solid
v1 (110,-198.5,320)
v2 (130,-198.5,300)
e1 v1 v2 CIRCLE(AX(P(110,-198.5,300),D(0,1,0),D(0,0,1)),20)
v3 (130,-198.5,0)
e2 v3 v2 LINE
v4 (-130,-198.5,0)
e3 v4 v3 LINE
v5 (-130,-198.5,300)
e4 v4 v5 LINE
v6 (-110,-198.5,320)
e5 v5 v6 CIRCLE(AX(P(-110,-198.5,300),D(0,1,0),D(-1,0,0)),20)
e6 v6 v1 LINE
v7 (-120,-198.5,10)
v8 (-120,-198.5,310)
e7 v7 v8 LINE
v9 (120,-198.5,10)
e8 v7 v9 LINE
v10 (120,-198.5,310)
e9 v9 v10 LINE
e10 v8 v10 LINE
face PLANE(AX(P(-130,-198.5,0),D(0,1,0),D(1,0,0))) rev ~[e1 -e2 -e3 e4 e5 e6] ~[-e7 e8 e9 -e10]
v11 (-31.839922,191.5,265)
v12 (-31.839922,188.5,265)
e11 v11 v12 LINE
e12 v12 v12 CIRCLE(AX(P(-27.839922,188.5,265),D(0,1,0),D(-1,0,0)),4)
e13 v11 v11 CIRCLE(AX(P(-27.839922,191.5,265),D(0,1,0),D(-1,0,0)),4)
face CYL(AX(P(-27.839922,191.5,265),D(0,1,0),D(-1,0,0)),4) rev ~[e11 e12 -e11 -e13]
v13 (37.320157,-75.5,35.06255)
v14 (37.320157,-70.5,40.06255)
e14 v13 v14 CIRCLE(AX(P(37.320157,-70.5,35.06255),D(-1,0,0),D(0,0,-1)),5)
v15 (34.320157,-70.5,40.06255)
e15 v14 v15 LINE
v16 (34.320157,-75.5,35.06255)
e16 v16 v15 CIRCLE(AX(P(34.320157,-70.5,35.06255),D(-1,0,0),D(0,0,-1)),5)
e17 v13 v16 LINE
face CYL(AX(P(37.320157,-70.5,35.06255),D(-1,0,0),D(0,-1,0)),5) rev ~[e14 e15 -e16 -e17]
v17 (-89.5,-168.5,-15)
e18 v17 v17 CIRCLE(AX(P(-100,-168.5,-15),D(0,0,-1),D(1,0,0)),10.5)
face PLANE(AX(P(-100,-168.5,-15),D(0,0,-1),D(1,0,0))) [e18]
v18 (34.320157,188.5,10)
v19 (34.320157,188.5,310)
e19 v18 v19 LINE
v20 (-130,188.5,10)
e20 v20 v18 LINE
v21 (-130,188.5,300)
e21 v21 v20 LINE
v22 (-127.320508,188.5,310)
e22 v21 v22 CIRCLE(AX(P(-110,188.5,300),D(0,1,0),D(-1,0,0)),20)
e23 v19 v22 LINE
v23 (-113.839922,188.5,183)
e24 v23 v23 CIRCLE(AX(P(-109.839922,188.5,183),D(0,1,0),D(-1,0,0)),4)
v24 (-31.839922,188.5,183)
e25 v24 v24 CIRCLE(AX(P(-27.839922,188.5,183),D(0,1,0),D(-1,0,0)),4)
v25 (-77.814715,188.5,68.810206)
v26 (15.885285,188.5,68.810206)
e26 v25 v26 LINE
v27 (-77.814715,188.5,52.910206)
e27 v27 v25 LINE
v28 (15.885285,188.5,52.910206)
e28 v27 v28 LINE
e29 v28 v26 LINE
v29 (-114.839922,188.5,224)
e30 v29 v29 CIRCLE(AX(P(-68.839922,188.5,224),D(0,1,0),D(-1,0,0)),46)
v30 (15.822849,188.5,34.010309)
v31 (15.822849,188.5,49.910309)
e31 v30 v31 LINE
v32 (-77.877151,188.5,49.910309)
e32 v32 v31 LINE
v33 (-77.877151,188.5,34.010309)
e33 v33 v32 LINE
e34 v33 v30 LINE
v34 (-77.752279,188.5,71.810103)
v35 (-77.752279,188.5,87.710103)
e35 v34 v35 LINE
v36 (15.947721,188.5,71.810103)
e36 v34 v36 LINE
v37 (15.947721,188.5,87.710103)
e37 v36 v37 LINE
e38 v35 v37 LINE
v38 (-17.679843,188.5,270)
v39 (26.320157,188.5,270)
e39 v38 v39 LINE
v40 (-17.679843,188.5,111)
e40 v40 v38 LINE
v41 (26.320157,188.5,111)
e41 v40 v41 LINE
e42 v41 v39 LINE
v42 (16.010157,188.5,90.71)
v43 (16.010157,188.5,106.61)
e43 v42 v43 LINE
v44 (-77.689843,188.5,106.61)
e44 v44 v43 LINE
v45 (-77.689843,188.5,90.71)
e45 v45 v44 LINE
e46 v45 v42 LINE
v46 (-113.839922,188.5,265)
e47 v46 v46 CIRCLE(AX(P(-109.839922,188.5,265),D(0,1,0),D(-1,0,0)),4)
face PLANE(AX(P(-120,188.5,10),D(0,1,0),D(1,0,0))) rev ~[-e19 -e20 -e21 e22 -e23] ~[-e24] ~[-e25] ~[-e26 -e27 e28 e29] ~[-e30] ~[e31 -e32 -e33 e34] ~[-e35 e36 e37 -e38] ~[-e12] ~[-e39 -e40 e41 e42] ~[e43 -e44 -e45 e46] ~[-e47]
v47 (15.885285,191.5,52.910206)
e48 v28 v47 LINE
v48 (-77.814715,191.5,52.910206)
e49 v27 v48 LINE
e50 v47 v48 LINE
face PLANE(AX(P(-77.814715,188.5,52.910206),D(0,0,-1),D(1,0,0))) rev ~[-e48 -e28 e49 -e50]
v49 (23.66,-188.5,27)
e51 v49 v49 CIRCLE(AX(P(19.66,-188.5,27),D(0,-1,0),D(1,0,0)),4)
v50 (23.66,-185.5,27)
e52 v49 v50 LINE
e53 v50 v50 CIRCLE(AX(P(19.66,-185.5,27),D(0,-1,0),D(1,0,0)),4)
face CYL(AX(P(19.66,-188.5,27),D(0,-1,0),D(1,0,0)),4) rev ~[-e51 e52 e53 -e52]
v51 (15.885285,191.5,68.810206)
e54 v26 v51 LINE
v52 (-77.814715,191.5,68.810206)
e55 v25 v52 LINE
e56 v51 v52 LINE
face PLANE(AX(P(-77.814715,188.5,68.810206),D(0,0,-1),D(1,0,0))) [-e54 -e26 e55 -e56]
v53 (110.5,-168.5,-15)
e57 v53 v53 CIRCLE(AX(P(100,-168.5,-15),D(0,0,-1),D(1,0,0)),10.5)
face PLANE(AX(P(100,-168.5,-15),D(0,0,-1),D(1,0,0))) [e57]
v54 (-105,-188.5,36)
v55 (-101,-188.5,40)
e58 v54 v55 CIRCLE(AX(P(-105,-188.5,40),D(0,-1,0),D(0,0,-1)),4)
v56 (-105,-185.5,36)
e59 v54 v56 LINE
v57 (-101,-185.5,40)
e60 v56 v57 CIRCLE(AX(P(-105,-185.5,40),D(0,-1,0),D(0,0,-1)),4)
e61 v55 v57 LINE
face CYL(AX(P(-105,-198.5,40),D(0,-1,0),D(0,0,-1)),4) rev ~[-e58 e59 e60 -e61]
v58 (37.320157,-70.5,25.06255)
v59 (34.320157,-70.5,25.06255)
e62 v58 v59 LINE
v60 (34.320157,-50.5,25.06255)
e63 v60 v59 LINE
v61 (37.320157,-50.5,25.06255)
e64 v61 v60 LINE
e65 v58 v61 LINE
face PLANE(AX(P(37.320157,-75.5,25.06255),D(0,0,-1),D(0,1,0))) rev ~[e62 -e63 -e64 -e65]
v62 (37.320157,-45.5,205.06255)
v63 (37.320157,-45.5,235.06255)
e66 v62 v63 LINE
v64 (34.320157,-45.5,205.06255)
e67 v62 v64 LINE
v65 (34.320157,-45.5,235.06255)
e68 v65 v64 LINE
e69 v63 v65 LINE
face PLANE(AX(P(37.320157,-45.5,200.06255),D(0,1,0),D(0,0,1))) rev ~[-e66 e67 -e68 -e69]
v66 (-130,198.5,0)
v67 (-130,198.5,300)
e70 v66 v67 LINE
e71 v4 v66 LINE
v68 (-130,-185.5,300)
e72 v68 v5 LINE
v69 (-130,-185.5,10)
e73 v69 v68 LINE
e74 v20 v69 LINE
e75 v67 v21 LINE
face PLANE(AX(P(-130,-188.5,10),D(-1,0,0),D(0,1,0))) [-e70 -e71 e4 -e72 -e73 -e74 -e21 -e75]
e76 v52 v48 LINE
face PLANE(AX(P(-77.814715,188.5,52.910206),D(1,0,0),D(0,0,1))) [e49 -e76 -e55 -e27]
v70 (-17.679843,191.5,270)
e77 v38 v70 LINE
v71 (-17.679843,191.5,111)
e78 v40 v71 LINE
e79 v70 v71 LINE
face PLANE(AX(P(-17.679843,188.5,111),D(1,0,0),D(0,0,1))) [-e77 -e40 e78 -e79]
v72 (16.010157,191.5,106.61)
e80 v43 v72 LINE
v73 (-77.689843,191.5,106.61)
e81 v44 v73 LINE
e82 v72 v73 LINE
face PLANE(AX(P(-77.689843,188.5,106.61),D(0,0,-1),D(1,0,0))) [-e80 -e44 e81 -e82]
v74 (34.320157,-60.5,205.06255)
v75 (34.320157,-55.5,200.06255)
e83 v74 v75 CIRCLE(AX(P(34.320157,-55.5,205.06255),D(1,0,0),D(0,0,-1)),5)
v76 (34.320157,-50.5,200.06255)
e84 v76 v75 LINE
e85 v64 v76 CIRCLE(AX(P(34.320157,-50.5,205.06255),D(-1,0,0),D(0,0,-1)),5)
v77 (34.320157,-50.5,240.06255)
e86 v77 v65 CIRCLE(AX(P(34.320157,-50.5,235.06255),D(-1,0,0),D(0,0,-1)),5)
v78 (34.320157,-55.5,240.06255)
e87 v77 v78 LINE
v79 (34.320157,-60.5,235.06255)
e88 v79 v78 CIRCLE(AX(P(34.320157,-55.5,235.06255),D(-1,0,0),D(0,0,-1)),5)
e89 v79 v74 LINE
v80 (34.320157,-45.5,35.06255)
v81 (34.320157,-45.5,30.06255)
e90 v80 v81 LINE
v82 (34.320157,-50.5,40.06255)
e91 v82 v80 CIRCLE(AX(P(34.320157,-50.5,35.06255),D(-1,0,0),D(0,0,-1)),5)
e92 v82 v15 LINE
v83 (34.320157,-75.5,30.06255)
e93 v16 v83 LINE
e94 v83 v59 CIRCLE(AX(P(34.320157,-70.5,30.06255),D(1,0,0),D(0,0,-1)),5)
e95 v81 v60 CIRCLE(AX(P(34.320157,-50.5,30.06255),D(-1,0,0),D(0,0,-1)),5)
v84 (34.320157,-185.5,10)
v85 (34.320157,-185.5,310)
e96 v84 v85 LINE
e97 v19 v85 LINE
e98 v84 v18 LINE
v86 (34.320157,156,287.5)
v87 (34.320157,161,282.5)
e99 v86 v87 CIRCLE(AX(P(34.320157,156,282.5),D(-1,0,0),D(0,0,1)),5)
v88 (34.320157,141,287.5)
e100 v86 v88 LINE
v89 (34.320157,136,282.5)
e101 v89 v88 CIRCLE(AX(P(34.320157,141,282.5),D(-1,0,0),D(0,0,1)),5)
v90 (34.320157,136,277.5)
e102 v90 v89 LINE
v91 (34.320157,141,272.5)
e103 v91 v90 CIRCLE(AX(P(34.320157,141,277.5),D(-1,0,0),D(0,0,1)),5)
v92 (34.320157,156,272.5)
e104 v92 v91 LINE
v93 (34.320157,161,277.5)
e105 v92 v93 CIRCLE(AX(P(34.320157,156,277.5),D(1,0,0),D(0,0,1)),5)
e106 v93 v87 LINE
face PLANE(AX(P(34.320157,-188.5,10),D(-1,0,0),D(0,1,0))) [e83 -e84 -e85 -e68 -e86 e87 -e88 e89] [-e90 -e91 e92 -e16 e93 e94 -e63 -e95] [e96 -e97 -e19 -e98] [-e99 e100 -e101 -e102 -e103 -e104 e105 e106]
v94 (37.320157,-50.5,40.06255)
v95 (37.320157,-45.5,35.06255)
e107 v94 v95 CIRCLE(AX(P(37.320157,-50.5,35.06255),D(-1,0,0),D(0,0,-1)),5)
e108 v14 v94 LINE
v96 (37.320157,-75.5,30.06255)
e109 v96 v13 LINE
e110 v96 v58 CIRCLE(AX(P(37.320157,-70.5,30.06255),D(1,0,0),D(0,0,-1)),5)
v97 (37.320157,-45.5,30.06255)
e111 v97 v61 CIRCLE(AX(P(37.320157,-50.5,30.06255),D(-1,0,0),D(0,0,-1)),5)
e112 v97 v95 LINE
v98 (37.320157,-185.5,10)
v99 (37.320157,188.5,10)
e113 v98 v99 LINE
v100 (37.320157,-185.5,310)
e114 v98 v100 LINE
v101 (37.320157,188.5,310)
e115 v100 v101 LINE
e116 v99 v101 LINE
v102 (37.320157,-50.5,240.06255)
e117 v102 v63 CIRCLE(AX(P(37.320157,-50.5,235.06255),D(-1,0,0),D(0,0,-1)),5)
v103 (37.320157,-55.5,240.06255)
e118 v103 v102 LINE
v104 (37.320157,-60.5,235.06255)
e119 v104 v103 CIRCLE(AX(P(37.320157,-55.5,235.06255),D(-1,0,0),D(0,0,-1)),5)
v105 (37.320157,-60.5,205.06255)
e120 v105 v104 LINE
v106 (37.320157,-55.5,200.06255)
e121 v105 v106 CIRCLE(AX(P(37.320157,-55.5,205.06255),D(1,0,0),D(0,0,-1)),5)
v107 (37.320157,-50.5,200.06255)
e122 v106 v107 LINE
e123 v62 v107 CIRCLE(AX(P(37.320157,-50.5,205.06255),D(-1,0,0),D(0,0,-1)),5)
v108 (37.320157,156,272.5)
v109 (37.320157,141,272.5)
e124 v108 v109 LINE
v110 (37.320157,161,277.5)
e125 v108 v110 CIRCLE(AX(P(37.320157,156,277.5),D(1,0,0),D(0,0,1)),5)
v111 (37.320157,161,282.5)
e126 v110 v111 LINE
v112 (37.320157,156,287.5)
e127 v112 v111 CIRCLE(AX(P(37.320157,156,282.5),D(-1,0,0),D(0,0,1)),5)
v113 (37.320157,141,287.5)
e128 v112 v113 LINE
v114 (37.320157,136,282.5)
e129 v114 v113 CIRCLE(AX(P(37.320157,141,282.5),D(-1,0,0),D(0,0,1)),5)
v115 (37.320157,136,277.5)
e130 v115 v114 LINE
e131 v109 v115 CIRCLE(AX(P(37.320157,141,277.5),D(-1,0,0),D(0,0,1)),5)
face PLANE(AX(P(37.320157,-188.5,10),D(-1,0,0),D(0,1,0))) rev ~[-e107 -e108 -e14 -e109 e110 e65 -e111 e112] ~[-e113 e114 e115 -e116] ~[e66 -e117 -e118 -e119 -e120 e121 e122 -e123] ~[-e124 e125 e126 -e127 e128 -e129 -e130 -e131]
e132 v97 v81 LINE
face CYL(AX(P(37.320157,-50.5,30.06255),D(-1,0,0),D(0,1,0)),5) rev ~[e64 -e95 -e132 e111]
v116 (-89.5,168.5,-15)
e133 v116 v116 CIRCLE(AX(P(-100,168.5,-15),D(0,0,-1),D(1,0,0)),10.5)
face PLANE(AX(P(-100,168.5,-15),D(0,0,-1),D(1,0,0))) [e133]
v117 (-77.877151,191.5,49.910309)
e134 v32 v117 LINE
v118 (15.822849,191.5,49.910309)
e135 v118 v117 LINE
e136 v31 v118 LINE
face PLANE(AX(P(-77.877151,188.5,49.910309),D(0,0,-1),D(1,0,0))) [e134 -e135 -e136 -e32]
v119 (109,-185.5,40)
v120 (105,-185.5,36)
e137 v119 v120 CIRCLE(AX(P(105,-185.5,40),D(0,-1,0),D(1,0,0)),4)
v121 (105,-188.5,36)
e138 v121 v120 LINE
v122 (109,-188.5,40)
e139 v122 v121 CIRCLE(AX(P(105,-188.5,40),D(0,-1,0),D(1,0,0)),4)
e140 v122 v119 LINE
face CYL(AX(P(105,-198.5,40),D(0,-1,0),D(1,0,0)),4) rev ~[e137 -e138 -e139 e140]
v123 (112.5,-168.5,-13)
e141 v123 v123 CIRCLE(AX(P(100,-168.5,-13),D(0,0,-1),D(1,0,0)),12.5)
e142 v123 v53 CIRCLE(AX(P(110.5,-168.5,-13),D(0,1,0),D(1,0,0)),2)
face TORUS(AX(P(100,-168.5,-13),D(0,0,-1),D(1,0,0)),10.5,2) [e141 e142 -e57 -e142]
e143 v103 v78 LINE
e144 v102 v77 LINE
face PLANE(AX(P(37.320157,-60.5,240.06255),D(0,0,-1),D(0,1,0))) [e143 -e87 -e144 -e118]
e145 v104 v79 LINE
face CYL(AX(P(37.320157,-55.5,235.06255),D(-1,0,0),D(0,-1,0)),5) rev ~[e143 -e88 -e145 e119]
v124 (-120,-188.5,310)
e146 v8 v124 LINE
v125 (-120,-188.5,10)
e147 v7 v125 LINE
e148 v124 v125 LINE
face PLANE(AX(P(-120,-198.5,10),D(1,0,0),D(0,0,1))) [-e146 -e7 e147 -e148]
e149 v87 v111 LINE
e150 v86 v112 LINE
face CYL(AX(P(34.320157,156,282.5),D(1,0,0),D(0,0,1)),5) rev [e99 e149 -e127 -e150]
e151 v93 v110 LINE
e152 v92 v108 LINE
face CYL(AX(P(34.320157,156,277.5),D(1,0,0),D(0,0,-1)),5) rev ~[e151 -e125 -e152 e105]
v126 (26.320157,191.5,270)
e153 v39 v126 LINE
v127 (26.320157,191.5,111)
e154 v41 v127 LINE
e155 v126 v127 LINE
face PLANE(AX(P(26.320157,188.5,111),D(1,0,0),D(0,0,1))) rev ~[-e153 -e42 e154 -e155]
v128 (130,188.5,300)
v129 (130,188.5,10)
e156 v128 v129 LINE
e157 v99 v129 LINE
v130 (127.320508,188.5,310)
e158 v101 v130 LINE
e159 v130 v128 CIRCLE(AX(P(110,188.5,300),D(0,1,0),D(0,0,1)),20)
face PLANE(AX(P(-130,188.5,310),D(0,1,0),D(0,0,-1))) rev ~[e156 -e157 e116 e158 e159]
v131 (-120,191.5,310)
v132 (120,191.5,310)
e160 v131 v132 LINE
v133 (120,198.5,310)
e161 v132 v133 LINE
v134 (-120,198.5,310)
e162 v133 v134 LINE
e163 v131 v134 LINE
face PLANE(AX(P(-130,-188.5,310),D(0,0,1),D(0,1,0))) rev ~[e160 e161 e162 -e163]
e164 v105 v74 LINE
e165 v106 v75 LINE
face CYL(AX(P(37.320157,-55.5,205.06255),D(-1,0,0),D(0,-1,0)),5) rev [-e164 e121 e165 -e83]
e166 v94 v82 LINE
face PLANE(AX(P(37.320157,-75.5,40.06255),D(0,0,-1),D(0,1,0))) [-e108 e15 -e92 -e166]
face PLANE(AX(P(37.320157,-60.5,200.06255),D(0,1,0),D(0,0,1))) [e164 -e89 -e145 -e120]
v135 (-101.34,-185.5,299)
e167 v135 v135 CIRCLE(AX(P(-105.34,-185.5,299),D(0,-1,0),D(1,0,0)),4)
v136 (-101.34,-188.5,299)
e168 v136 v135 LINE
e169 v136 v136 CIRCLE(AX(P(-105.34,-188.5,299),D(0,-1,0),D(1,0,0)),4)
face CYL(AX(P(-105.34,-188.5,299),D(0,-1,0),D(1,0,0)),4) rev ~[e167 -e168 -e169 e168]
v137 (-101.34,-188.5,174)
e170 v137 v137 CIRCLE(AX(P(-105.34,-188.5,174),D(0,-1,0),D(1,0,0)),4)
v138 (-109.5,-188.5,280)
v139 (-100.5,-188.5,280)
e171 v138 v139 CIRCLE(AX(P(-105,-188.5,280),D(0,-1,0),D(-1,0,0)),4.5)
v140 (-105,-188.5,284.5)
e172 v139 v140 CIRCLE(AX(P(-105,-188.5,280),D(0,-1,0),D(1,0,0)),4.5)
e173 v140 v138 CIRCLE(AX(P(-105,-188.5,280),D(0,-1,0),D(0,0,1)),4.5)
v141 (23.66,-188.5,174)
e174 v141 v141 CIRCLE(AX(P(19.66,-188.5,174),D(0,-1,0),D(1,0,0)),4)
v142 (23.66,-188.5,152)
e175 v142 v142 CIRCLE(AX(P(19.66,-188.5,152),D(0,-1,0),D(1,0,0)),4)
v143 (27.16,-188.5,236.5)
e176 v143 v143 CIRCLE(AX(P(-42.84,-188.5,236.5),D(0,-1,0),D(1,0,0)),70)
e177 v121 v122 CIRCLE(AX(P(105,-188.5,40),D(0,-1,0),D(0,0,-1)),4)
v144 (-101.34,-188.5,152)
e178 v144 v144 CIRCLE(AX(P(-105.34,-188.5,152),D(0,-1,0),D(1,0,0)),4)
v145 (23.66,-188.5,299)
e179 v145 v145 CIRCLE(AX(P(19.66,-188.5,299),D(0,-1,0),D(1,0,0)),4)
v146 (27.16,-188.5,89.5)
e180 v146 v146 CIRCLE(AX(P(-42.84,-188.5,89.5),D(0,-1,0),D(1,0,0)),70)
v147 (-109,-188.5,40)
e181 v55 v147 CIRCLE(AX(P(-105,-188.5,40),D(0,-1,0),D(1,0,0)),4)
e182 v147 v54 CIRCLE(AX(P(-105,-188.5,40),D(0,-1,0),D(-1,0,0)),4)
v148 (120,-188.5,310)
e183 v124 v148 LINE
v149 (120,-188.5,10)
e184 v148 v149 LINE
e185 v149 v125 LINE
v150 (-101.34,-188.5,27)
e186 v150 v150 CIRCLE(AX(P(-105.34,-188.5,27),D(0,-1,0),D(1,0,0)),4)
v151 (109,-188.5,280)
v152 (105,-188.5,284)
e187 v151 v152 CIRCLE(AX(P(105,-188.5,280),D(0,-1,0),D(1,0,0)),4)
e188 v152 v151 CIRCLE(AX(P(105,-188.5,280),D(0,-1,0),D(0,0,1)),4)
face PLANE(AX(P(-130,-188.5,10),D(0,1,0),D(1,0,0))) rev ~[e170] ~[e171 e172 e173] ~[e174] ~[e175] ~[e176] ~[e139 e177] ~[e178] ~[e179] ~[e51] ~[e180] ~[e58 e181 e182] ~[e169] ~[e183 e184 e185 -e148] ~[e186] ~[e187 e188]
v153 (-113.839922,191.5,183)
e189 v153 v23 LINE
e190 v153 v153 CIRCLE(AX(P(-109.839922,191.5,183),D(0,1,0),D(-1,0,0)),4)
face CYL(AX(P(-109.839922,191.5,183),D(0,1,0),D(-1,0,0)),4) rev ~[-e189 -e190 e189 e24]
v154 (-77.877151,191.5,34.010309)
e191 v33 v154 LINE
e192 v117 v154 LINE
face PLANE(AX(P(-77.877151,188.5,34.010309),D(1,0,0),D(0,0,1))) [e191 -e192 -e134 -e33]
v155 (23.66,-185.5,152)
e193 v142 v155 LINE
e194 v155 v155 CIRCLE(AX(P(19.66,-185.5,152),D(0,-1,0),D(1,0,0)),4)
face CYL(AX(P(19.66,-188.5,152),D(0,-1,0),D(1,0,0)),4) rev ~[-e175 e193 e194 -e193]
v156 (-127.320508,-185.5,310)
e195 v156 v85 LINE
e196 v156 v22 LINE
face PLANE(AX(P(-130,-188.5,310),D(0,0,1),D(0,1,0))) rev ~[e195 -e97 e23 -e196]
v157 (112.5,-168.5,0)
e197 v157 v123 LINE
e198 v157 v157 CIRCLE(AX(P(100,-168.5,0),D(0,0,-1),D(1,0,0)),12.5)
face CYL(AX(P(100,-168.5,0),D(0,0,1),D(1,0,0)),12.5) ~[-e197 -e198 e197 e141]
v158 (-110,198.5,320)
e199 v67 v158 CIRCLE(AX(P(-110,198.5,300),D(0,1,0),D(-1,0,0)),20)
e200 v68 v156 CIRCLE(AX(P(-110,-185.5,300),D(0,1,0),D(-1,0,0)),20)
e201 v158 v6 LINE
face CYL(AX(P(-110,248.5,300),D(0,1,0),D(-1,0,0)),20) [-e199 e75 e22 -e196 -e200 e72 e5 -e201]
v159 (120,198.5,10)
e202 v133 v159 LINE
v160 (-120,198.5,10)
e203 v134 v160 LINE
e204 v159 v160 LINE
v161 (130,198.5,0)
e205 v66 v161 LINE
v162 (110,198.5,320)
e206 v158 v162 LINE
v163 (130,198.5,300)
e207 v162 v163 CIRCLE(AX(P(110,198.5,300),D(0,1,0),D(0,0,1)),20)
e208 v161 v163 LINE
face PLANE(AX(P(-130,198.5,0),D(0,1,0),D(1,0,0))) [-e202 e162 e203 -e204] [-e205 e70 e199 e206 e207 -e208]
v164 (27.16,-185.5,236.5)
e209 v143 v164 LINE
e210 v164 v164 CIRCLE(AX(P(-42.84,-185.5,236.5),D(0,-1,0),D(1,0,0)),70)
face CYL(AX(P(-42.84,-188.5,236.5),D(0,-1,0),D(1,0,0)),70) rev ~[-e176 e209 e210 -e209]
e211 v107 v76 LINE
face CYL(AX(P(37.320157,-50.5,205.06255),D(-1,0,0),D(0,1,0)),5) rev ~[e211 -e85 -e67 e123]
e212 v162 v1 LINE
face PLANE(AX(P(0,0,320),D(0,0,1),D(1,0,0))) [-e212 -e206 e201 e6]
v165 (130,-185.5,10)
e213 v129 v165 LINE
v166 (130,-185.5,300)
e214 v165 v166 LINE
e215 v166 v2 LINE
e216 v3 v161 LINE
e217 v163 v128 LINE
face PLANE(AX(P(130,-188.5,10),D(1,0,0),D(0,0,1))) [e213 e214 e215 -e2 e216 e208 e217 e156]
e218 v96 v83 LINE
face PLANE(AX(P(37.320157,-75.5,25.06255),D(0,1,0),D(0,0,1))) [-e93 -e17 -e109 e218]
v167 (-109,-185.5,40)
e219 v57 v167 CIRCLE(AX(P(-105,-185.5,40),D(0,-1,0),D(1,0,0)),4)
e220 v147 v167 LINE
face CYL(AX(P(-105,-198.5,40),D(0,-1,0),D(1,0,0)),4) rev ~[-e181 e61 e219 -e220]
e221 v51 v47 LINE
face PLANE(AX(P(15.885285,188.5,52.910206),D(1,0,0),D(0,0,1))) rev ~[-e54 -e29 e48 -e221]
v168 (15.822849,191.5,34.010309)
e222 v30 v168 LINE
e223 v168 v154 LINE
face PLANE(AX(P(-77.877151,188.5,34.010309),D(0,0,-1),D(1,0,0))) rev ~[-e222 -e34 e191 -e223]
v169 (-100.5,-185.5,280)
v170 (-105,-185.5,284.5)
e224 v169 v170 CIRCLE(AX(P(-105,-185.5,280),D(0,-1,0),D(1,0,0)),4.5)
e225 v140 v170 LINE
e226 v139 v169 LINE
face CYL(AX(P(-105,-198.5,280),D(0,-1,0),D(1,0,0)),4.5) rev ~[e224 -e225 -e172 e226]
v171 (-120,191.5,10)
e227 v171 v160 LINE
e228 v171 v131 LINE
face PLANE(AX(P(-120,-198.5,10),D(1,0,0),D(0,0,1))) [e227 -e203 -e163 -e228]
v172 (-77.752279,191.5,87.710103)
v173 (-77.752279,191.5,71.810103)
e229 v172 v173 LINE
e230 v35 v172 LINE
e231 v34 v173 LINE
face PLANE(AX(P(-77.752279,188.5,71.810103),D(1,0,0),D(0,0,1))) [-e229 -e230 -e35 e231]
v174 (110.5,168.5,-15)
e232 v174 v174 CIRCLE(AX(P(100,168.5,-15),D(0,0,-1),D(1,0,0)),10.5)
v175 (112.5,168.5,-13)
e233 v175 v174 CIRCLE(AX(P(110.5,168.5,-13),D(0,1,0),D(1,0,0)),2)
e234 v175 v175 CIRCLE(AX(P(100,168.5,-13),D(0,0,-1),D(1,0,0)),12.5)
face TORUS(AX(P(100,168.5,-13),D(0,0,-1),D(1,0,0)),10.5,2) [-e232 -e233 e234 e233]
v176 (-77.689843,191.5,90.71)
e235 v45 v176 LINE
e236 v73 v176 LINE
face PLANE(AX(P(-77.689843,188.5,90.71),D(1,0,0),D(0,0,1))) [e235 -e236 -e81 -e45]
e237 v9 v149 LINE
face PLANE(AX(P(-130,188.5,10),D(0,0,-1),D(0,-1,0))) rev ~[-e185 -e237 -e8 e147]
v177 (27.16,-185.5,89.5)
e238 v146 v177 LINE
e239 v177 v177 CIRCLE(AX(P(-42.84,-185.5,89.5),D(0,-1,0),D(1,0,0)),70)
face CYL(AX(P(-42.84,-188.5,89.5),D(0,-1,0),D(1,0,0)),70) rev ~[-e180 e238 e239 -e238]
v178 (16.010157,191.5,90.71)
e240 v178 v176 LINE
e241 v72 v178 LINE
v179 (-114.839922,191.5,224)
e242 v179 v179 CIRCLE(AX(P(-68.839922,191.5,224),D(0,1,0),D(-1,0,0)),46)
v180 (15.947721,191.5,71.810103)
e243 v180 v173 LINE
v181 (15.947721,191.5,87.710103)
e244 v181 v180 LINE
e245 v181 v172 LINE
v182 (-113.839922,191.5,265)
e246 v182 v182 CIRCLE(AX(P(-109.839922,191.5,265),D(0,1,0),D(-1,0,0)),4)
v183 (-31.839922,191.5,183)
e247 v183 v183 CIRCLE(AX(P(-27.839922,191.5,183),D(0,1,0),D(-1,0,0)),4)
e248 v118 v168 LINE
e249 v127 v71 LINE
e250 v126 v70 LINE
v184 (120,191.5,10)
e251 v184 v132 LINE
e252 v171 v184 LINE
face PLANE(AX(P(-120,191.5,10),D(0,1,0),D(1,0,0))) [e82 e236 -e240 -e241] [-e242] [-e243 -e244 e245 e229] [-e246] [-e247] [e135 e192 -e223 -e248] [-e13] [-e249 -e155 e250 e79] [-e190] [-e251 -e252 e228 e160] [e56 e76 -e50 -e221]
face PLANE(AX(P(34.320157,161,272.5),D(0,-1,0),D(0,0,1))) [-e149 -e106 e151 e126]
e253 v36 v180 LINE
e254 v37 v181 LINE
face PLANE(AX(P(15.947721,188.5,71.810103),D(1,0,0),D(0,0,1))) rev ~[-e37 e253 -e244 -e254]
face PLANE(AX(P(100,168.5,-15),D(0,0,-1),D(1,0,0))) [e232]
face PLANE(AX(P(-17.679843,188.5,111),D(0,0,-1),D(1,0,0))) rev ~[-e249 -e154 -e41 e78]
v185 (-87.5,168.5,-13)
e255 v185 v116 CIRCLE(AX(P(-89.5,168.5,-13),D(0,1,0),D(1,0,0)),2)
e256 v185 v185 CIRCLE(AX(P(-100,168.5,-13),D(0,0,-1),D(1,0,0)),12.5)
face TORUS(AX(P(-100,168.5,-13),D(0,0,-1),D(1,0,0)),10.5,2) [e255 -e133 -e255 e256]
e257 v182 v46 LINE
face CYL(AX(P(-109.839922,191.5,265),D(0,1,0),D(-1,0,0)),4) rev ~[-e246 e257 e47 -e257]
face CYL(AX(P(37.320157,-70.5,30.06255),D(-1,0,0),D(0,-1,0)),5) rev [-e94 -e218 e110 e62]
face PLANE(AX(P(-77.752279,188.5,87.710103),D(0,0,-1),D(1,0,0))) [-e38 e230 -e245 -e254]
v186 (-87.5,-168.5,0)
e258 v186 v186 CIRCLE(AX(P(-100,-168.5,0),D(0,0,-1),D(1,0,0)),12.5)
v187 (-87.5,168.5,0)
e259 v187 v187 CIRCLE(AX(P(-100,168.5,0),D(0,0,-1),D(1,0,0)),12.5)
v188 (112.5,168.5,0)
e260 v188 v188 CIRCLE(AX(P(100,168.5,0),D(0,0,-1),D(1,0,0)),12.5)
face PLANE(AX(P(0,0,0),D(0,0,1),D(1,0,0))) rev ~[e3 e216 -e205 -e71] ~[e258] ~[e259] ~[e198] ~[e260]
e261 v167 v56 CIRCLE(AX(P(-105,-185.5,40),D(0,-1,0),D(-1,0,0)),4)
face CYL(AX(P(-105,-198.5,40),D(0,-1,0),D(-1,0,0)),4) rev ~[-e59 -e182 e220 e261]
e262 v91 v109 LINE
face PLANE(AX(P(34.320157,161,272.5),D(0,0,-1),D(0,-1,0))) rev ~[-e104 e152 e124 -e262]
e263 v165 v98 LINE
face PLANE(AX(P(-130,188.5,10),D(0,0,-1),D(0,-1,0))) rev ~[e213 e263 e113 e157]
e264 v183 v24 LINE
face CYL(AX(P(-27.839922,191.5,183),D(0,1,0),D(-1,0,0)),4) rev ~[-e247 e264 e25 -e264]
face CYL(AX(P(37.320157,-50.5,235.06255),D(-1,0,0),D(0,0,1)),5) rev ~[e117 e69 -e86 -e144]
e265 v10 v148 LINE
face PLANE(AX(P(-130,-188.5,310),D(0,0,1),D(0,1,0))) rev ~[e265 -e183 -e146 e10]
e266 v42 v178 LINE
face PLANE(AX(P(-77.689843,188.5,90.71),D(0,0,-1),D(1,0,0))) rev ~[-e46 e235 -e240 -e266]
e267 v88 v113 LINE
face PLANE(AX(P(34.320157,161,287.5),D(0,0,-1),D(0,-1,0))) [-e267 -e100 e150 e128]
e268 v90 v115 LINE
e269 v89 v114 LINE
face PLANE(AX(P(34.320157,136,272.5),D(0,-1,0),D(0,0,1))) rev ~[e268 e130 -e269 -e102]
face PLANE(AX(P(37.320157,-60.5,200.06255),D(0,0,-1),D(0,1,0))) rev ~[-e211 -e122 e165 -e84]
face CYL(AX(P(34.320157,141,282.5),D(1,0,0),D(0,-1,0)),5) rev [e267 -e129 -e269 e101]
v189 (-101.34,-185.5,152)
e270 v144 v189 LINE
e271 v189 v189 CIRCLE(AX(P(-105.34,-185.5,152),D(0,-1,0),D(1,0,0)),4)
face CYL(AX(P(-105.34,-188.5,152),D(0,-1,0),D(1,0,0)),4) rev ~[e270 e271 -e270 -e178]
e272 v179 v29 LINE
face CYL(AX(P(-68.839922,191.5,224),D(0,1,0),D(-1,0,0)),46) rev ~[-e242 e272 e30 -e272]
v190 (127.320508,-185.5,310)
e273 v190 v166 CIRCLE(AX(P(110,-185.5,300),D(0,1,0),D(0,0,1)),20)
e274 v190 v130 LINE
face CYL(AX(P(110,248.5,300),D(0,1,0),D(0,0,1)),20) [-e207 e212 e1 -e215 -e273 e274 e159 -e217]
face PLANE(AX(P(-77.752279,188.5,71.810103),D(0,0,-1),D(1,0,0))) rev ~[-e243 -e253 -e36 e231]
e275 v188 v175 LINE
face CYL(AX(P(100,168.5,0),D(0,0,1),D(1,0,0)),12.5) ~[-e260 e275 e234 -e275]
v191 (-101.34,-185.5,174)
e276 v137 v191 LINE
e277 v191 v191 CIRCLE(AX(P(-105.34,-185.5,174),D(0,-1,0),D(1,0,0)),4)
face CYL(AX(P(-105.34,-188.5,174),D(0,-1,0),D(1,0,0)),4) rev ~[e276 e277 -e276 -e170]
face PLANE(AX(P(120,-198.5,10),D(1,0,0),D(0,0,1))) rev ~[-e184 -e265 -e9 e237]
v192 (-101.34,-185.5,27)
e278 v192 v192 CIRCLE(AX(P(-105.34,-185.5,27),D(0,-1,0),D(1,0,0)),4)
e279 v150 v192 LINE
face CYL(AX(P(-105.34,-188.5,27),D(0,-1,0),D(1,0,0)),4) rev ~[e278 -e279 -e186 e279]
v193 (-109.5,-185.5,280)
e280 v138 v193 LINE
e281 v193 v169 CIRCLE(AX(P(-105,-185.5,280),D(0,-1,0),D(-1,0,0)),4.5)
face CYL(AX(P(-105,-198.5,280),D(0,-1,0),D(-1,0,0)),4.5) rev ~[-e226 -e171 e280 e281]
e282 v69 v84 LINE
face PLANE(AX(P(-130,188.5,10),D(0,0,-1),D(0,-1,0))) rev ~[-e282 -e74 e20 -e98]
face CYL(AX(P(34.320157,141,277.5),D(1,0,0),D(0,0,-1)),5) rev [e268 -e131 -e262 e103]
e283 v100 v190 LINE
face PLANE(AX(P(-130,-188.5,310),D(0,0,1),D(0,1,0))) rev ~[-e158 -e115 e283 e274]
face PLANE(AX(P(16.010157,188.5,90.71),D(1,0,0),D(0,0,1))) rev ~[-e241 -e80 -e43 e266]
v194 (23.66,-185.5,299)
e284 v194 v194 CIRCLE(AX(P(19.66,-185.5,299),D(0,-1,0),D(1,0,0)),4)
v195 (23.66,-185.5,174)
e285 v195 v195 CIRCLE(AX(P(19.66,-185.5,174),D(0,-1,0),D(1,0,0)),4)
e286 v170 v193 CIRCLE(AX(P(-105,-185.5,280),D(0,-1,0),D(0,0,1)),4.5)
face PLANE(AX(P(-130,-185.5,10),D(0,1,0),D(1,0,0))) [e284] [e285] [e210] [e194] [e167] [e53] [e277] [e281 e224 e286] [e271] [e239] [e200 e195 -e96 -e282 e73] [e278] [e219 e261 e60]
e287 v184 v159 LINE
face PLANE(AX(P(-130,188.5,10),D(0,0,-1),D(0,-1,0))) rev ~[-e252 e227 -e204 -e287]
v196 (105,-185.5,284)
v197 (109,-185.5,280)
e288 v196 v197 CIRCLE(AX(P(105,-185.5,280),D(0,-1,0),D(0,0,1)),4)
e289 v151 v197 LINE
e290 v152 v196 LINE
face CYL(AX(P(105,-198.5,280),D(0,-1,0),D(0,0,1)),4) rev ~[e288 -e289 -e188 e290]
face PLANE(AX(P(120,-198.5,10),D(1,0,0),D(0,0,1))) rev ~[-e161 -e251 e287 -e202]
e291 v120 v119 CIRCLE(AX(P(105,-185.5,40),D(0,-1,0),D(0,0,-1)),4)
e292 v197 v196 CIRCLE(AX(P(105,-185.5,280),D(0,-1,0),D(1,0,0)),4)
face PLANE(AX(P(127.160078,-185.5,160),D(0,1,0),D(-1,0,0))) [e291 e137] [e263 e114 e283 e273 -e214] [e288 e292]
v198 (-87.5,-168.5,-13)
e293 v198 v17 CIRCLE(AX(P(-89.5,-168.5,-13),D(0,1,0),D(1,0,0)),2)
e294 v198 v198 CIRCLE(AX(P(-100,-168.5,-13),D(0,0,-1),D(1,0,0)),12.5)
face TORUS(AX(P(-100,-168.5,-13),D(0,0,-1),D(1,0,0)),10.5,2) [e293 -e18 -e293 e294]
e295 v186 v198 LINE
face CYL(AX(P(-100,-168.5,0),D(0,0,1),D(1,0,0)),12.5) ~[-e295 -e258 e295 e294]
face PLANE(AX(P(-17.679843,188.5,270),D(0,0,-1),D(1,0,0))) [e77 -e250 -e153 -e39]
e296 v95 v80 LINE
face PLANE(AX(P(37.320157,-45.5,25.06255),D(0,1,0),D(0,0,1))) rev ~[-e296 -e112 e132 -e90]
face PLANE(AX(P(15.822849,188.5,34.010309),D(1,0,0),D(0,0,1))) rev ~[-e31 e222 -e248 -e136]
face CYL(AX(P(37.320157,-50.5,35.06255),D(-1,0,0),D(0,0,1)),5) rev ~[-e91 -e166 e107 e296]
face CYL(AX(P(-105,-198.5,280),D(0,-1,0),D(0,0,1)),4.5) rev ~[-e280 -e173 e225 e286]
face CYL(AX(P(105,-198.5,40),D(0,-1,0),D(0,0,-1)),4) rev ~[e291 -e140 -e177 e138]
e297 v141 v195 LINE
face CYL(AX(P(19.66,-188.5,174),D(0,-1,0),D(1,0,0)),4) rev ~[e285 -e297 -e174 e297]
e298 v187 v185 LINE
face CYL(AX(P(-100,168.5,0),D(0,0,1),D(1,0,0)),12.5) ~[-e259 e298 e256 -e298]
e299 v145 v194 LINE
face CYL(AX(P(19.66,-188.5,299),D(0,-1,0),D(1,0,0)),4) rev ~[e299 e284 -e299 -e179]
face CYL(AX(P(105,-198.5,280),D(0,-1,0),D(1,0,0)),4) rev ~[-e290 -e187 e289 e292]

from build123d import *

# Parameters (mm, degrees)
F0_W         = 260
F0_H         = 397
F1_DEPTH     = 320
F2_W         = 240
F2_H         = 300
F3_DEPTH     = 506.73
F5_DEPTH     = 304.8
F6_W         = 3
F6_H         = 377
F7_DEPTH     = 300
F8_R         = 12.5
F9_DEPTH     = 15
F10_R        = 2
F11_W        = 3
F11_H        = 377
F12_DEPTH    = 300
F13_W        = 3
F13_H        = 300
F14_DEPTH    = 87
F15_W        = 3
F15_H        = 300
F16_DEPTH    = 160
F17_R        = 4
F17_R_2      = 70
F18_DEPTH    = 10
F19_W        = 344
F19_H        = 300
F20_DEPTH    = 206
F21_W        = 240
F21_H        = 3
F22_DEPTH    = 300
F23_W        = 44
F23_H        = 159
F23_W_2      = 93.7
F23_H_2      = 15.9
F24_DEPTH    = 25
F25_R        = 4
F25_R_2      = 46
F26_DEPTH    = 25
F27_W        = 3
F27_H        = 300
F28_DEPTH    = 377
F29_W        = 30
F29_H        = 300
F30_DEPTH    = 25
F31_W        = 161.3201568723
F31_H        = 300
F32_DEPTH    = 25
F33_W        = 164.3201568723
F33_H        = 3
F34_DEPTH    = 300
F35_T1_DEPTH = 497
F36_R        = 70
F36_R_2      = 4
F37_DEPTH    = 25
F38_W        = 377
F38_H        = 300
F39_DEPTH    = 3
F40_W        = 5.6798431277
F40_H        = 300
F41_DEPTH    = 3
F42_T1_DEPTH = 497
F43_W        = 3
F43_H        = 374
F44_DEPTH    = 300
F45_W        = 3
F45_H        = 374
F46_DEPTH    = 300
F47_W        = 25
F47_H        = 15
F48_DEPTH    = 25
F49_R        = 5
F51_W        = 15
F51_H        = 40
F51_W_2      = 30
F51_H_2      = 15
F52_DEPTH    = 25
F53_R        = 5
F54_R        = 5
F56_DEPTH    = 25


# Not quite as in the source:
# - a fillet or chamfer that OpenCascade refuses, or shapes differently, is made with other operations: its cross-section is extruded or revolved along the edge and cut away or added


with BuildPart() as f1:
    # F0 (on Top) → F1 (new body)
    with BuildSketch(Plane.XY):
        Rectangle(F0_W, F0_H)
    extrude(amount=F1_DEPTH)

    # F2 (on face) → F3 (cut)
    with BuildSketch(Plane.XZ.offset(198.5)):
        with Locations((0, 160)):
            Rectangle(F2_W, F2_H)
    extrude(amount=-F3_DEPTH, mode=Mode.SUBTRACT)

    # F4 (on face) → F5 (cut)
    with BuildSketch(Plane(origin=(-130, 0, 0), x_dir=(0, -1, 0), z_dir=(-1, 0, 0))):
        Polygon((188.5, 10), (188.5, 310), (-188.5, 310), (-188.5, 10), (0, 10), align=None)
    extrude(amount=-F5_DEPTH, mode=Mode.SUBTRACT)

    # F6 (on face) → F7 (join)
    with BuildSketch(Plane.XY.offset(10)):
        with Locations((-125.8077577353, 0)):
            Rectangle(F6_W, F6_H)
        with Locations((125.8201568723, 0)):
            Rectangle(F6_W, F6_H)
    extrude(amount=F7_DEPTH)

    # F8 (on face) → F9 (join)
    with BuildSketch(Plane(origin=(0, 0, 0), x_dir=(1, 0, 0), z_dir=(0, 0, -1))):
        with Locations((-100, 168.5)):
            Circle(F8_R)
        with Locations((100, 168.5)):
            Circle(F8_R)
        with Locations((100, -168.5)):
            Circle(F8_R)
        with Locations((-100, -168.5)):
            Circle(F8_R)
    extrude(amount=F9_DEPTH)

    # F10
    f10_edges = [f1.edges().sort_by_distance(p)[0] for p in [
        (-112.5, -168.5, -15),
        (87.5, -168.5, -15),
        (87.5, 168.5, -15),
        (-112.5, 168.5, -15),
    ]]
    fillet(f10_edges, radius=F10_R)

    # F11 (on face) → F12 (join)
    with BuildSketch(Plane.XY.offset(10)):
        with Locations((35.8201568723, 0)):
            Rectangle(F11_W, F11_H)
    extrude(amount=F12_DEPTH)

    # F13 (on face) → F14 (join)
    with BuildSketch(Plane.YZ.offset(37.3201568723)):
        with Locations((-187, 160)):
            Rectangle(F13_W, F13_H)
    extrude(amount=F14_DEPTH)

    # F15 (on face) → F16 (join)
    with BuildSketch(Plane(origin=(34.3201568723, 0, 0), x_dir=(0, -1, 0), z_dir=(-1, 0, 0))):
        with Locations((157, 160)):
            Rectangle(F15_W, F15_H)
    extrude(amount=F16_DEPTH)

    # F17 (on face) → F18 (cut)
    with BuildSketch(Plane.XZ.offset(158.5)):
        with Locations((-105.3498431277, 299)):
            Circle(F17_R)
        with Locations((19.6501568723, 299)):
            Circle(F17_R)
        with Locations((-105.3498431277, 174)):
            Circle(F17_R)
        with Locations((19.6501568723, 174)):
            Circle(F17_R)
        with Locations((-42.8498431277, 236.5)):
            Circle(F17_R_2)
        with Locations((-42.8498431277, 83.5)):
            Circle(F17_R_2)
        with Locations((19.6501568723, 146)):
            Circle(F17_R)
        with Locations((19.6501568723, 21)):
            Circle(F17_R)
        with Locations((-105.3498431277, 21)):
            Circle(F17_R)
        with Locations((-105.3498431277, 146)):
            Circle(F17_R)
    extrude(amount=-F18_DEPTH, mode=Mode.SUBTRACT)

    # F19 (on face) → F20 (cut)
    with BuildSketch(Plane.YZ.offset(-124.3077577353)):
        with Locations((16.5, 160)):
            Rectangle(F19_W, F19_H)
    extrude(amount=-F20_DEPTH, mode=Mode.SUBTRACT)

    # F21 (on face) → F22 (join)
    with BuildSketch(Plane.XY.offset(10)):
        with Locations((0, 190)):
            Rectangle(F21_W, F21_H)
    extrude(amount=F22_DEPTH)

    # F23 (on face) → F24 (cut)
    with BuildSketch(Plane.XZ.offset(-188.5)):
        with Locations((4.3201568723, 190.5)):
            Rectangle(F23_W, F23_H)
        with Locations((-30.9022790795, 79.7601031285)):
            Rectangle(F23_W_2, F23_H_2)
        with Locations((-30.8398431277, 98.66)):
            Rectangle(F23_W_2, F23_H_2)
        with Locations((-30.9647150313, 60.8602062571)):
            Rectangle(F23_W_2, F23_H_2)
        with Locations((-31.0271509831, 41.9603093856)):
            Rectangle(F23_W_2, F23_H_2)
    extrude(amount=-F24_DEPTH, mode=Mode.SUBTRACT)

    # F25 (on face) → F26 (cut)
    with BuildSketch(Plane(origin=(0, 191.5, 0), x_dir=(-1, 0, 0), z_dir=(0, 1, 0))):
        with Locations((27.8399215639, 265)):
            Circle(F25_R)
        with Locations((109.8399215639, 265)):
            Circle(F25_R)
        with Locations((27.8399215639, 183)):
            Circle(F25_R)
        with Locations((109.8399215639, 183)):
            Circle(F25_R)
        with Locations((68.8399215639, 224)):
            Circle(F25_R_2)
    extrude(amount=-F26_DEPTH, mode=Mode.SUBTRACT)

    # F27 (on face) → F28 (cut)
    with BuildSketch(Plane.XZ.offset(-188.5)):
        with Locations((-128.5, 160)):
            Rectangle(F27_W, F27_H)
    extrude(amount=F28_DEPTH, mode=Mode.SUBTRACT)

    # F29 (on face) → F30 (cut)
    with BuildSketch(Plane(origin=(-127, 0, 0), x_dir=(0, -1, 0), z_dir=(-1, 0, 0))):
        with Locations((173.5, 160)):
            Rectangle(F29_W, F29_H)
    extrude(amount=-F30_DEPTH, mode=Mode.SUBTRACT)

    # F31 (on face) → F32 (cut)
    with BuildSketch(Plane(origin=(0, -155.5, 0), x_dir=(-1, 0, 0), z_dir=(0, 1, 0))):
        with Locations((46.3399215639, 160)):
            Rectangle(F31_W, F31_H)
    extrude(amount=-F32_DEPTH, mode=Mode.SUBTRACT)

    # F33 (on face) → F34 (join)
    with BuildSketch(Plane.XY.offset(10)):
        with Locations((-47.8399215639, -187)):
            Rectangle(F33_W, F33_H)
    extrude(amount=F34_DEPTH)

    # F35: fillet of radius 20 on 1 edges, made by hand

    # F35_s2 → F35_t1 (cut)
    with BuildSketch(Plane.XZ.offset(-248.5)):
        with BuildLine():
            ThreePointArc((-130, 300), (-124.1421356237, 314.1421356237), (-110, 320))
            Line((-110, 320), (-130, 320))
            Line((-130, 320), (-130, 300))
        make_face()
    extrude(amount=F35_T1_DEPTH, mode=Mode.SUBTRACT)

    # F36 (on face) → F37 (cut)
    with BuildSketch(Plane.XZ.offset(188.5)):
        with Locations((-42.84, 236.5)):
            Circle(F36_R)
        with Locations((-105.34, 299)):
            Circle(F36_R_2)
        with Locations((19.66, 299)):
            Circle(F36_R_2)
        with Locations((-105.34, 174)):
            Circle(F36_R_2)
        with Locations((19.66, 174)):
            Circle(F36_R_2)
        with Locations((-42.84, 89.5)):
            Circle(F36_R)
        with Locations((-105.34, 152)):
            Circle(F36_R_2)
        with Locations((19.66, 152)):
            Circle(F36_R_2)
        with Locations((19.66, 27)):
            Circle(F36_R_2)
        with Locations((-105.34, 27)):
            Circle(F36_R_2)
    extrude(amount=-F37_DEPTH, mode=Mode.SUBTRACT)

    # F38 (on face) → F39 (cut)
    with BuildSketch(Plane.YZ.offset(127.3201568723)):
        with Locations((0, 160)):
            Rectangle(F38_W, F38_H)
    extrude(amount=-F39_DEPTH, mode=Mode.SUBTRACT)

    # F40 (on face) → F41 (join)
    with BuildSketch(Plane(origin=(0, -188.5, 0), x_dir=(-1, 0, 0), z_dir=(0, 1, 0))):
        with Locations((-127.1600784361, 160)):
            Rectangle(F40_W, F40_H)
    extrude(amount=F41_DEPTH)

    # F42: fillet of radius 20 on 1 edges, made by hand

    # F42_s2 → F42_t1 (cut)
    with BuildSketch(Plane.XZ.offset(-248.5)):
        with BuildLine():
            ThreePointArc((110, 320), (124.1421356237, 314.1421356237), (130, 300))
            Line((130, 300), (130, 320))
            Line((130, 320), (110, 320))
        make_face()
    extrude(amount=F42_T1_DEPTH, mode=Mode.SUBTRACT)

    # F47 (on face) → F48 (cut)
    with BuildSketch(Plane(origin=(34.3201568723, 0, 0), x_dir=(0, -1, 0), z_dir=(-1, 0, 0))):
        with Locations((-148.5, 280)):
            Rectangle(F47_W, F47_H)
    extrude(amount=-F48_DEPTH, mode=Mode.SUBTRACT)

    # F49
    f49_edges = [f1.edges().sort_by_distance(p)[0] for p in [
        (35.820157, 161, 272.5),
        (35.820157, 161, 287.5),
        (35.820157, 136, 287.5),
        (35.820157, 136, 272.5),
    ]]
    fillet(f49_edges, radius=F49_R)

    # F51 (on face) → F52 (cut)
    with BuildSketch(Plane.YZ.offset(37.3201568723)):
        with Locations((-53, 220.0625501573)):
            Rectangle(F51_W, F51_H)
        with Locations((-60.5, 32.5625501573)):
            Rectangle(F51_W_2, F51_H_2)
    extrude(amount=-F52_DEPTH, mode=Mode.SUBTRACT)

    # F53
    f53_edges = [f1.edges().sort_by_distance(p)[0] for p in [
        (35.820157, -75.5, 25.06255),
        (35.820157, -75.5, 40.06255),
        (35.820157, -45.5, 25.06255),
        (35.820157, -45.5, 40.06255),
    ]]
    fillet(f53_edges, radius=F53_R)

    # F54
    f54_edges = [f1.edges().sort_by_distance(p)[0] for p in [
        (35.820157, -60.5, 200.06255),
        (35.820157, -45.5, 200.06255),
        (35.820157, -45.5, 240.06255),
        (35.820157, -60.5, 240.06255),
    ]]
    fillet(f54_edges, radius=F54_R)

    # F55 (on face) → F56 (cut)
    with BuildSketch(Plane.XZ.offset(198.5)):
        with BuildLine():
            ThreePointArc((-101, 40), (-105, 44), (-109, 40))
            Line((-109, 40), (-105, 40))
            Line((-105, 40), (-105, 36))
            ThreePointArc((-105, 36), (-102.1715728753, 37.1715728753), (-101, 40))
        make_face()
        with BuildLine():
            Line((-105, 40), (-109, 40))
            ThreePointArc((-109, 40), (-107.8284271247, 37.1715728753), (-105, 36))
            Line((-105, 36), (-105, 40))
        make_face()
        with BuildLine():
            ThreePointArc((105, 36), (107.8284271247, 37.1715728753), (109, 40))
            Line((109, 40), (105, 40))
            Line((105, 40), (105, 36))
        make_face()
        with BuildLine():
            Line((105, 40), (109, 40))
            ThreePointArc((109, 40), (102.1715728753, 42.8284271247), (105, 36))
            Line((105, 36), (105, 40))
        make_face()
        with BuildLine():
            ThreePointArc((105, 284), (102.1715728753, 277.1715728753), (109, 280))
            Line((109, 280), (105, 280))
            Line((105, 280), (105, 284))
        make_face()
        with BuildLine():
            Line((105, 280), (109, 280))
            ThreePointArc((109, 280), (107.8284271247, 282.8284271247), (105, 284))
            Line((105, 284), (105, 280))
        make_face()
        with BuildLine():
            ThreePointArc((-105, 284.5), (-108.1819805153, 283.1819805153), (-109.5, 280))
            Line((-109.5, 280), (-105, 280))
            Line((-105, 280), (-105, 284.5))
        make_face()
        with BuildLine():
            Line((-105, 280), (-109.5, 280))
            ThreePointArc((-109.5, 280), (-105, 275.5), (-100.5, 280))
            ThreePointArc((-100.5, 280), (-101.8180194847, 283.1819805153), (-105, 284.5))
            Line((-105, 284.5), (-105, 280))
        make_face()
    extrude(amount=-F56_DEPTH, mode=Mode.SUBTRACT)


with BuildPart() as f44:
    # F43 (on face) → F44 (new body)
    with BuildSketch(Plane(origin=(0, 0, 310), x_dir=(1, 0, 0), z_dir=(0, 0, -1))):
        with Locations((-125.8205080757, -1.5)):
            Rectangle(F43_W, F43_H)
    extrude(amount=F44_DEPTH)


with BuildPart() as f46:
    # F45 (on face) → F46 (new body)
    with BuildSketch(Plane(origin=(0, 0, 310), x_dir=(1, 0, 0), z_dir=(0, 0, -1))):
        with Locations((125.8205080757, -1.5)):
            Rectangle(F45_W, F45_H)
    extrude(amount=F46_DEPTH)


solid = f1.part
